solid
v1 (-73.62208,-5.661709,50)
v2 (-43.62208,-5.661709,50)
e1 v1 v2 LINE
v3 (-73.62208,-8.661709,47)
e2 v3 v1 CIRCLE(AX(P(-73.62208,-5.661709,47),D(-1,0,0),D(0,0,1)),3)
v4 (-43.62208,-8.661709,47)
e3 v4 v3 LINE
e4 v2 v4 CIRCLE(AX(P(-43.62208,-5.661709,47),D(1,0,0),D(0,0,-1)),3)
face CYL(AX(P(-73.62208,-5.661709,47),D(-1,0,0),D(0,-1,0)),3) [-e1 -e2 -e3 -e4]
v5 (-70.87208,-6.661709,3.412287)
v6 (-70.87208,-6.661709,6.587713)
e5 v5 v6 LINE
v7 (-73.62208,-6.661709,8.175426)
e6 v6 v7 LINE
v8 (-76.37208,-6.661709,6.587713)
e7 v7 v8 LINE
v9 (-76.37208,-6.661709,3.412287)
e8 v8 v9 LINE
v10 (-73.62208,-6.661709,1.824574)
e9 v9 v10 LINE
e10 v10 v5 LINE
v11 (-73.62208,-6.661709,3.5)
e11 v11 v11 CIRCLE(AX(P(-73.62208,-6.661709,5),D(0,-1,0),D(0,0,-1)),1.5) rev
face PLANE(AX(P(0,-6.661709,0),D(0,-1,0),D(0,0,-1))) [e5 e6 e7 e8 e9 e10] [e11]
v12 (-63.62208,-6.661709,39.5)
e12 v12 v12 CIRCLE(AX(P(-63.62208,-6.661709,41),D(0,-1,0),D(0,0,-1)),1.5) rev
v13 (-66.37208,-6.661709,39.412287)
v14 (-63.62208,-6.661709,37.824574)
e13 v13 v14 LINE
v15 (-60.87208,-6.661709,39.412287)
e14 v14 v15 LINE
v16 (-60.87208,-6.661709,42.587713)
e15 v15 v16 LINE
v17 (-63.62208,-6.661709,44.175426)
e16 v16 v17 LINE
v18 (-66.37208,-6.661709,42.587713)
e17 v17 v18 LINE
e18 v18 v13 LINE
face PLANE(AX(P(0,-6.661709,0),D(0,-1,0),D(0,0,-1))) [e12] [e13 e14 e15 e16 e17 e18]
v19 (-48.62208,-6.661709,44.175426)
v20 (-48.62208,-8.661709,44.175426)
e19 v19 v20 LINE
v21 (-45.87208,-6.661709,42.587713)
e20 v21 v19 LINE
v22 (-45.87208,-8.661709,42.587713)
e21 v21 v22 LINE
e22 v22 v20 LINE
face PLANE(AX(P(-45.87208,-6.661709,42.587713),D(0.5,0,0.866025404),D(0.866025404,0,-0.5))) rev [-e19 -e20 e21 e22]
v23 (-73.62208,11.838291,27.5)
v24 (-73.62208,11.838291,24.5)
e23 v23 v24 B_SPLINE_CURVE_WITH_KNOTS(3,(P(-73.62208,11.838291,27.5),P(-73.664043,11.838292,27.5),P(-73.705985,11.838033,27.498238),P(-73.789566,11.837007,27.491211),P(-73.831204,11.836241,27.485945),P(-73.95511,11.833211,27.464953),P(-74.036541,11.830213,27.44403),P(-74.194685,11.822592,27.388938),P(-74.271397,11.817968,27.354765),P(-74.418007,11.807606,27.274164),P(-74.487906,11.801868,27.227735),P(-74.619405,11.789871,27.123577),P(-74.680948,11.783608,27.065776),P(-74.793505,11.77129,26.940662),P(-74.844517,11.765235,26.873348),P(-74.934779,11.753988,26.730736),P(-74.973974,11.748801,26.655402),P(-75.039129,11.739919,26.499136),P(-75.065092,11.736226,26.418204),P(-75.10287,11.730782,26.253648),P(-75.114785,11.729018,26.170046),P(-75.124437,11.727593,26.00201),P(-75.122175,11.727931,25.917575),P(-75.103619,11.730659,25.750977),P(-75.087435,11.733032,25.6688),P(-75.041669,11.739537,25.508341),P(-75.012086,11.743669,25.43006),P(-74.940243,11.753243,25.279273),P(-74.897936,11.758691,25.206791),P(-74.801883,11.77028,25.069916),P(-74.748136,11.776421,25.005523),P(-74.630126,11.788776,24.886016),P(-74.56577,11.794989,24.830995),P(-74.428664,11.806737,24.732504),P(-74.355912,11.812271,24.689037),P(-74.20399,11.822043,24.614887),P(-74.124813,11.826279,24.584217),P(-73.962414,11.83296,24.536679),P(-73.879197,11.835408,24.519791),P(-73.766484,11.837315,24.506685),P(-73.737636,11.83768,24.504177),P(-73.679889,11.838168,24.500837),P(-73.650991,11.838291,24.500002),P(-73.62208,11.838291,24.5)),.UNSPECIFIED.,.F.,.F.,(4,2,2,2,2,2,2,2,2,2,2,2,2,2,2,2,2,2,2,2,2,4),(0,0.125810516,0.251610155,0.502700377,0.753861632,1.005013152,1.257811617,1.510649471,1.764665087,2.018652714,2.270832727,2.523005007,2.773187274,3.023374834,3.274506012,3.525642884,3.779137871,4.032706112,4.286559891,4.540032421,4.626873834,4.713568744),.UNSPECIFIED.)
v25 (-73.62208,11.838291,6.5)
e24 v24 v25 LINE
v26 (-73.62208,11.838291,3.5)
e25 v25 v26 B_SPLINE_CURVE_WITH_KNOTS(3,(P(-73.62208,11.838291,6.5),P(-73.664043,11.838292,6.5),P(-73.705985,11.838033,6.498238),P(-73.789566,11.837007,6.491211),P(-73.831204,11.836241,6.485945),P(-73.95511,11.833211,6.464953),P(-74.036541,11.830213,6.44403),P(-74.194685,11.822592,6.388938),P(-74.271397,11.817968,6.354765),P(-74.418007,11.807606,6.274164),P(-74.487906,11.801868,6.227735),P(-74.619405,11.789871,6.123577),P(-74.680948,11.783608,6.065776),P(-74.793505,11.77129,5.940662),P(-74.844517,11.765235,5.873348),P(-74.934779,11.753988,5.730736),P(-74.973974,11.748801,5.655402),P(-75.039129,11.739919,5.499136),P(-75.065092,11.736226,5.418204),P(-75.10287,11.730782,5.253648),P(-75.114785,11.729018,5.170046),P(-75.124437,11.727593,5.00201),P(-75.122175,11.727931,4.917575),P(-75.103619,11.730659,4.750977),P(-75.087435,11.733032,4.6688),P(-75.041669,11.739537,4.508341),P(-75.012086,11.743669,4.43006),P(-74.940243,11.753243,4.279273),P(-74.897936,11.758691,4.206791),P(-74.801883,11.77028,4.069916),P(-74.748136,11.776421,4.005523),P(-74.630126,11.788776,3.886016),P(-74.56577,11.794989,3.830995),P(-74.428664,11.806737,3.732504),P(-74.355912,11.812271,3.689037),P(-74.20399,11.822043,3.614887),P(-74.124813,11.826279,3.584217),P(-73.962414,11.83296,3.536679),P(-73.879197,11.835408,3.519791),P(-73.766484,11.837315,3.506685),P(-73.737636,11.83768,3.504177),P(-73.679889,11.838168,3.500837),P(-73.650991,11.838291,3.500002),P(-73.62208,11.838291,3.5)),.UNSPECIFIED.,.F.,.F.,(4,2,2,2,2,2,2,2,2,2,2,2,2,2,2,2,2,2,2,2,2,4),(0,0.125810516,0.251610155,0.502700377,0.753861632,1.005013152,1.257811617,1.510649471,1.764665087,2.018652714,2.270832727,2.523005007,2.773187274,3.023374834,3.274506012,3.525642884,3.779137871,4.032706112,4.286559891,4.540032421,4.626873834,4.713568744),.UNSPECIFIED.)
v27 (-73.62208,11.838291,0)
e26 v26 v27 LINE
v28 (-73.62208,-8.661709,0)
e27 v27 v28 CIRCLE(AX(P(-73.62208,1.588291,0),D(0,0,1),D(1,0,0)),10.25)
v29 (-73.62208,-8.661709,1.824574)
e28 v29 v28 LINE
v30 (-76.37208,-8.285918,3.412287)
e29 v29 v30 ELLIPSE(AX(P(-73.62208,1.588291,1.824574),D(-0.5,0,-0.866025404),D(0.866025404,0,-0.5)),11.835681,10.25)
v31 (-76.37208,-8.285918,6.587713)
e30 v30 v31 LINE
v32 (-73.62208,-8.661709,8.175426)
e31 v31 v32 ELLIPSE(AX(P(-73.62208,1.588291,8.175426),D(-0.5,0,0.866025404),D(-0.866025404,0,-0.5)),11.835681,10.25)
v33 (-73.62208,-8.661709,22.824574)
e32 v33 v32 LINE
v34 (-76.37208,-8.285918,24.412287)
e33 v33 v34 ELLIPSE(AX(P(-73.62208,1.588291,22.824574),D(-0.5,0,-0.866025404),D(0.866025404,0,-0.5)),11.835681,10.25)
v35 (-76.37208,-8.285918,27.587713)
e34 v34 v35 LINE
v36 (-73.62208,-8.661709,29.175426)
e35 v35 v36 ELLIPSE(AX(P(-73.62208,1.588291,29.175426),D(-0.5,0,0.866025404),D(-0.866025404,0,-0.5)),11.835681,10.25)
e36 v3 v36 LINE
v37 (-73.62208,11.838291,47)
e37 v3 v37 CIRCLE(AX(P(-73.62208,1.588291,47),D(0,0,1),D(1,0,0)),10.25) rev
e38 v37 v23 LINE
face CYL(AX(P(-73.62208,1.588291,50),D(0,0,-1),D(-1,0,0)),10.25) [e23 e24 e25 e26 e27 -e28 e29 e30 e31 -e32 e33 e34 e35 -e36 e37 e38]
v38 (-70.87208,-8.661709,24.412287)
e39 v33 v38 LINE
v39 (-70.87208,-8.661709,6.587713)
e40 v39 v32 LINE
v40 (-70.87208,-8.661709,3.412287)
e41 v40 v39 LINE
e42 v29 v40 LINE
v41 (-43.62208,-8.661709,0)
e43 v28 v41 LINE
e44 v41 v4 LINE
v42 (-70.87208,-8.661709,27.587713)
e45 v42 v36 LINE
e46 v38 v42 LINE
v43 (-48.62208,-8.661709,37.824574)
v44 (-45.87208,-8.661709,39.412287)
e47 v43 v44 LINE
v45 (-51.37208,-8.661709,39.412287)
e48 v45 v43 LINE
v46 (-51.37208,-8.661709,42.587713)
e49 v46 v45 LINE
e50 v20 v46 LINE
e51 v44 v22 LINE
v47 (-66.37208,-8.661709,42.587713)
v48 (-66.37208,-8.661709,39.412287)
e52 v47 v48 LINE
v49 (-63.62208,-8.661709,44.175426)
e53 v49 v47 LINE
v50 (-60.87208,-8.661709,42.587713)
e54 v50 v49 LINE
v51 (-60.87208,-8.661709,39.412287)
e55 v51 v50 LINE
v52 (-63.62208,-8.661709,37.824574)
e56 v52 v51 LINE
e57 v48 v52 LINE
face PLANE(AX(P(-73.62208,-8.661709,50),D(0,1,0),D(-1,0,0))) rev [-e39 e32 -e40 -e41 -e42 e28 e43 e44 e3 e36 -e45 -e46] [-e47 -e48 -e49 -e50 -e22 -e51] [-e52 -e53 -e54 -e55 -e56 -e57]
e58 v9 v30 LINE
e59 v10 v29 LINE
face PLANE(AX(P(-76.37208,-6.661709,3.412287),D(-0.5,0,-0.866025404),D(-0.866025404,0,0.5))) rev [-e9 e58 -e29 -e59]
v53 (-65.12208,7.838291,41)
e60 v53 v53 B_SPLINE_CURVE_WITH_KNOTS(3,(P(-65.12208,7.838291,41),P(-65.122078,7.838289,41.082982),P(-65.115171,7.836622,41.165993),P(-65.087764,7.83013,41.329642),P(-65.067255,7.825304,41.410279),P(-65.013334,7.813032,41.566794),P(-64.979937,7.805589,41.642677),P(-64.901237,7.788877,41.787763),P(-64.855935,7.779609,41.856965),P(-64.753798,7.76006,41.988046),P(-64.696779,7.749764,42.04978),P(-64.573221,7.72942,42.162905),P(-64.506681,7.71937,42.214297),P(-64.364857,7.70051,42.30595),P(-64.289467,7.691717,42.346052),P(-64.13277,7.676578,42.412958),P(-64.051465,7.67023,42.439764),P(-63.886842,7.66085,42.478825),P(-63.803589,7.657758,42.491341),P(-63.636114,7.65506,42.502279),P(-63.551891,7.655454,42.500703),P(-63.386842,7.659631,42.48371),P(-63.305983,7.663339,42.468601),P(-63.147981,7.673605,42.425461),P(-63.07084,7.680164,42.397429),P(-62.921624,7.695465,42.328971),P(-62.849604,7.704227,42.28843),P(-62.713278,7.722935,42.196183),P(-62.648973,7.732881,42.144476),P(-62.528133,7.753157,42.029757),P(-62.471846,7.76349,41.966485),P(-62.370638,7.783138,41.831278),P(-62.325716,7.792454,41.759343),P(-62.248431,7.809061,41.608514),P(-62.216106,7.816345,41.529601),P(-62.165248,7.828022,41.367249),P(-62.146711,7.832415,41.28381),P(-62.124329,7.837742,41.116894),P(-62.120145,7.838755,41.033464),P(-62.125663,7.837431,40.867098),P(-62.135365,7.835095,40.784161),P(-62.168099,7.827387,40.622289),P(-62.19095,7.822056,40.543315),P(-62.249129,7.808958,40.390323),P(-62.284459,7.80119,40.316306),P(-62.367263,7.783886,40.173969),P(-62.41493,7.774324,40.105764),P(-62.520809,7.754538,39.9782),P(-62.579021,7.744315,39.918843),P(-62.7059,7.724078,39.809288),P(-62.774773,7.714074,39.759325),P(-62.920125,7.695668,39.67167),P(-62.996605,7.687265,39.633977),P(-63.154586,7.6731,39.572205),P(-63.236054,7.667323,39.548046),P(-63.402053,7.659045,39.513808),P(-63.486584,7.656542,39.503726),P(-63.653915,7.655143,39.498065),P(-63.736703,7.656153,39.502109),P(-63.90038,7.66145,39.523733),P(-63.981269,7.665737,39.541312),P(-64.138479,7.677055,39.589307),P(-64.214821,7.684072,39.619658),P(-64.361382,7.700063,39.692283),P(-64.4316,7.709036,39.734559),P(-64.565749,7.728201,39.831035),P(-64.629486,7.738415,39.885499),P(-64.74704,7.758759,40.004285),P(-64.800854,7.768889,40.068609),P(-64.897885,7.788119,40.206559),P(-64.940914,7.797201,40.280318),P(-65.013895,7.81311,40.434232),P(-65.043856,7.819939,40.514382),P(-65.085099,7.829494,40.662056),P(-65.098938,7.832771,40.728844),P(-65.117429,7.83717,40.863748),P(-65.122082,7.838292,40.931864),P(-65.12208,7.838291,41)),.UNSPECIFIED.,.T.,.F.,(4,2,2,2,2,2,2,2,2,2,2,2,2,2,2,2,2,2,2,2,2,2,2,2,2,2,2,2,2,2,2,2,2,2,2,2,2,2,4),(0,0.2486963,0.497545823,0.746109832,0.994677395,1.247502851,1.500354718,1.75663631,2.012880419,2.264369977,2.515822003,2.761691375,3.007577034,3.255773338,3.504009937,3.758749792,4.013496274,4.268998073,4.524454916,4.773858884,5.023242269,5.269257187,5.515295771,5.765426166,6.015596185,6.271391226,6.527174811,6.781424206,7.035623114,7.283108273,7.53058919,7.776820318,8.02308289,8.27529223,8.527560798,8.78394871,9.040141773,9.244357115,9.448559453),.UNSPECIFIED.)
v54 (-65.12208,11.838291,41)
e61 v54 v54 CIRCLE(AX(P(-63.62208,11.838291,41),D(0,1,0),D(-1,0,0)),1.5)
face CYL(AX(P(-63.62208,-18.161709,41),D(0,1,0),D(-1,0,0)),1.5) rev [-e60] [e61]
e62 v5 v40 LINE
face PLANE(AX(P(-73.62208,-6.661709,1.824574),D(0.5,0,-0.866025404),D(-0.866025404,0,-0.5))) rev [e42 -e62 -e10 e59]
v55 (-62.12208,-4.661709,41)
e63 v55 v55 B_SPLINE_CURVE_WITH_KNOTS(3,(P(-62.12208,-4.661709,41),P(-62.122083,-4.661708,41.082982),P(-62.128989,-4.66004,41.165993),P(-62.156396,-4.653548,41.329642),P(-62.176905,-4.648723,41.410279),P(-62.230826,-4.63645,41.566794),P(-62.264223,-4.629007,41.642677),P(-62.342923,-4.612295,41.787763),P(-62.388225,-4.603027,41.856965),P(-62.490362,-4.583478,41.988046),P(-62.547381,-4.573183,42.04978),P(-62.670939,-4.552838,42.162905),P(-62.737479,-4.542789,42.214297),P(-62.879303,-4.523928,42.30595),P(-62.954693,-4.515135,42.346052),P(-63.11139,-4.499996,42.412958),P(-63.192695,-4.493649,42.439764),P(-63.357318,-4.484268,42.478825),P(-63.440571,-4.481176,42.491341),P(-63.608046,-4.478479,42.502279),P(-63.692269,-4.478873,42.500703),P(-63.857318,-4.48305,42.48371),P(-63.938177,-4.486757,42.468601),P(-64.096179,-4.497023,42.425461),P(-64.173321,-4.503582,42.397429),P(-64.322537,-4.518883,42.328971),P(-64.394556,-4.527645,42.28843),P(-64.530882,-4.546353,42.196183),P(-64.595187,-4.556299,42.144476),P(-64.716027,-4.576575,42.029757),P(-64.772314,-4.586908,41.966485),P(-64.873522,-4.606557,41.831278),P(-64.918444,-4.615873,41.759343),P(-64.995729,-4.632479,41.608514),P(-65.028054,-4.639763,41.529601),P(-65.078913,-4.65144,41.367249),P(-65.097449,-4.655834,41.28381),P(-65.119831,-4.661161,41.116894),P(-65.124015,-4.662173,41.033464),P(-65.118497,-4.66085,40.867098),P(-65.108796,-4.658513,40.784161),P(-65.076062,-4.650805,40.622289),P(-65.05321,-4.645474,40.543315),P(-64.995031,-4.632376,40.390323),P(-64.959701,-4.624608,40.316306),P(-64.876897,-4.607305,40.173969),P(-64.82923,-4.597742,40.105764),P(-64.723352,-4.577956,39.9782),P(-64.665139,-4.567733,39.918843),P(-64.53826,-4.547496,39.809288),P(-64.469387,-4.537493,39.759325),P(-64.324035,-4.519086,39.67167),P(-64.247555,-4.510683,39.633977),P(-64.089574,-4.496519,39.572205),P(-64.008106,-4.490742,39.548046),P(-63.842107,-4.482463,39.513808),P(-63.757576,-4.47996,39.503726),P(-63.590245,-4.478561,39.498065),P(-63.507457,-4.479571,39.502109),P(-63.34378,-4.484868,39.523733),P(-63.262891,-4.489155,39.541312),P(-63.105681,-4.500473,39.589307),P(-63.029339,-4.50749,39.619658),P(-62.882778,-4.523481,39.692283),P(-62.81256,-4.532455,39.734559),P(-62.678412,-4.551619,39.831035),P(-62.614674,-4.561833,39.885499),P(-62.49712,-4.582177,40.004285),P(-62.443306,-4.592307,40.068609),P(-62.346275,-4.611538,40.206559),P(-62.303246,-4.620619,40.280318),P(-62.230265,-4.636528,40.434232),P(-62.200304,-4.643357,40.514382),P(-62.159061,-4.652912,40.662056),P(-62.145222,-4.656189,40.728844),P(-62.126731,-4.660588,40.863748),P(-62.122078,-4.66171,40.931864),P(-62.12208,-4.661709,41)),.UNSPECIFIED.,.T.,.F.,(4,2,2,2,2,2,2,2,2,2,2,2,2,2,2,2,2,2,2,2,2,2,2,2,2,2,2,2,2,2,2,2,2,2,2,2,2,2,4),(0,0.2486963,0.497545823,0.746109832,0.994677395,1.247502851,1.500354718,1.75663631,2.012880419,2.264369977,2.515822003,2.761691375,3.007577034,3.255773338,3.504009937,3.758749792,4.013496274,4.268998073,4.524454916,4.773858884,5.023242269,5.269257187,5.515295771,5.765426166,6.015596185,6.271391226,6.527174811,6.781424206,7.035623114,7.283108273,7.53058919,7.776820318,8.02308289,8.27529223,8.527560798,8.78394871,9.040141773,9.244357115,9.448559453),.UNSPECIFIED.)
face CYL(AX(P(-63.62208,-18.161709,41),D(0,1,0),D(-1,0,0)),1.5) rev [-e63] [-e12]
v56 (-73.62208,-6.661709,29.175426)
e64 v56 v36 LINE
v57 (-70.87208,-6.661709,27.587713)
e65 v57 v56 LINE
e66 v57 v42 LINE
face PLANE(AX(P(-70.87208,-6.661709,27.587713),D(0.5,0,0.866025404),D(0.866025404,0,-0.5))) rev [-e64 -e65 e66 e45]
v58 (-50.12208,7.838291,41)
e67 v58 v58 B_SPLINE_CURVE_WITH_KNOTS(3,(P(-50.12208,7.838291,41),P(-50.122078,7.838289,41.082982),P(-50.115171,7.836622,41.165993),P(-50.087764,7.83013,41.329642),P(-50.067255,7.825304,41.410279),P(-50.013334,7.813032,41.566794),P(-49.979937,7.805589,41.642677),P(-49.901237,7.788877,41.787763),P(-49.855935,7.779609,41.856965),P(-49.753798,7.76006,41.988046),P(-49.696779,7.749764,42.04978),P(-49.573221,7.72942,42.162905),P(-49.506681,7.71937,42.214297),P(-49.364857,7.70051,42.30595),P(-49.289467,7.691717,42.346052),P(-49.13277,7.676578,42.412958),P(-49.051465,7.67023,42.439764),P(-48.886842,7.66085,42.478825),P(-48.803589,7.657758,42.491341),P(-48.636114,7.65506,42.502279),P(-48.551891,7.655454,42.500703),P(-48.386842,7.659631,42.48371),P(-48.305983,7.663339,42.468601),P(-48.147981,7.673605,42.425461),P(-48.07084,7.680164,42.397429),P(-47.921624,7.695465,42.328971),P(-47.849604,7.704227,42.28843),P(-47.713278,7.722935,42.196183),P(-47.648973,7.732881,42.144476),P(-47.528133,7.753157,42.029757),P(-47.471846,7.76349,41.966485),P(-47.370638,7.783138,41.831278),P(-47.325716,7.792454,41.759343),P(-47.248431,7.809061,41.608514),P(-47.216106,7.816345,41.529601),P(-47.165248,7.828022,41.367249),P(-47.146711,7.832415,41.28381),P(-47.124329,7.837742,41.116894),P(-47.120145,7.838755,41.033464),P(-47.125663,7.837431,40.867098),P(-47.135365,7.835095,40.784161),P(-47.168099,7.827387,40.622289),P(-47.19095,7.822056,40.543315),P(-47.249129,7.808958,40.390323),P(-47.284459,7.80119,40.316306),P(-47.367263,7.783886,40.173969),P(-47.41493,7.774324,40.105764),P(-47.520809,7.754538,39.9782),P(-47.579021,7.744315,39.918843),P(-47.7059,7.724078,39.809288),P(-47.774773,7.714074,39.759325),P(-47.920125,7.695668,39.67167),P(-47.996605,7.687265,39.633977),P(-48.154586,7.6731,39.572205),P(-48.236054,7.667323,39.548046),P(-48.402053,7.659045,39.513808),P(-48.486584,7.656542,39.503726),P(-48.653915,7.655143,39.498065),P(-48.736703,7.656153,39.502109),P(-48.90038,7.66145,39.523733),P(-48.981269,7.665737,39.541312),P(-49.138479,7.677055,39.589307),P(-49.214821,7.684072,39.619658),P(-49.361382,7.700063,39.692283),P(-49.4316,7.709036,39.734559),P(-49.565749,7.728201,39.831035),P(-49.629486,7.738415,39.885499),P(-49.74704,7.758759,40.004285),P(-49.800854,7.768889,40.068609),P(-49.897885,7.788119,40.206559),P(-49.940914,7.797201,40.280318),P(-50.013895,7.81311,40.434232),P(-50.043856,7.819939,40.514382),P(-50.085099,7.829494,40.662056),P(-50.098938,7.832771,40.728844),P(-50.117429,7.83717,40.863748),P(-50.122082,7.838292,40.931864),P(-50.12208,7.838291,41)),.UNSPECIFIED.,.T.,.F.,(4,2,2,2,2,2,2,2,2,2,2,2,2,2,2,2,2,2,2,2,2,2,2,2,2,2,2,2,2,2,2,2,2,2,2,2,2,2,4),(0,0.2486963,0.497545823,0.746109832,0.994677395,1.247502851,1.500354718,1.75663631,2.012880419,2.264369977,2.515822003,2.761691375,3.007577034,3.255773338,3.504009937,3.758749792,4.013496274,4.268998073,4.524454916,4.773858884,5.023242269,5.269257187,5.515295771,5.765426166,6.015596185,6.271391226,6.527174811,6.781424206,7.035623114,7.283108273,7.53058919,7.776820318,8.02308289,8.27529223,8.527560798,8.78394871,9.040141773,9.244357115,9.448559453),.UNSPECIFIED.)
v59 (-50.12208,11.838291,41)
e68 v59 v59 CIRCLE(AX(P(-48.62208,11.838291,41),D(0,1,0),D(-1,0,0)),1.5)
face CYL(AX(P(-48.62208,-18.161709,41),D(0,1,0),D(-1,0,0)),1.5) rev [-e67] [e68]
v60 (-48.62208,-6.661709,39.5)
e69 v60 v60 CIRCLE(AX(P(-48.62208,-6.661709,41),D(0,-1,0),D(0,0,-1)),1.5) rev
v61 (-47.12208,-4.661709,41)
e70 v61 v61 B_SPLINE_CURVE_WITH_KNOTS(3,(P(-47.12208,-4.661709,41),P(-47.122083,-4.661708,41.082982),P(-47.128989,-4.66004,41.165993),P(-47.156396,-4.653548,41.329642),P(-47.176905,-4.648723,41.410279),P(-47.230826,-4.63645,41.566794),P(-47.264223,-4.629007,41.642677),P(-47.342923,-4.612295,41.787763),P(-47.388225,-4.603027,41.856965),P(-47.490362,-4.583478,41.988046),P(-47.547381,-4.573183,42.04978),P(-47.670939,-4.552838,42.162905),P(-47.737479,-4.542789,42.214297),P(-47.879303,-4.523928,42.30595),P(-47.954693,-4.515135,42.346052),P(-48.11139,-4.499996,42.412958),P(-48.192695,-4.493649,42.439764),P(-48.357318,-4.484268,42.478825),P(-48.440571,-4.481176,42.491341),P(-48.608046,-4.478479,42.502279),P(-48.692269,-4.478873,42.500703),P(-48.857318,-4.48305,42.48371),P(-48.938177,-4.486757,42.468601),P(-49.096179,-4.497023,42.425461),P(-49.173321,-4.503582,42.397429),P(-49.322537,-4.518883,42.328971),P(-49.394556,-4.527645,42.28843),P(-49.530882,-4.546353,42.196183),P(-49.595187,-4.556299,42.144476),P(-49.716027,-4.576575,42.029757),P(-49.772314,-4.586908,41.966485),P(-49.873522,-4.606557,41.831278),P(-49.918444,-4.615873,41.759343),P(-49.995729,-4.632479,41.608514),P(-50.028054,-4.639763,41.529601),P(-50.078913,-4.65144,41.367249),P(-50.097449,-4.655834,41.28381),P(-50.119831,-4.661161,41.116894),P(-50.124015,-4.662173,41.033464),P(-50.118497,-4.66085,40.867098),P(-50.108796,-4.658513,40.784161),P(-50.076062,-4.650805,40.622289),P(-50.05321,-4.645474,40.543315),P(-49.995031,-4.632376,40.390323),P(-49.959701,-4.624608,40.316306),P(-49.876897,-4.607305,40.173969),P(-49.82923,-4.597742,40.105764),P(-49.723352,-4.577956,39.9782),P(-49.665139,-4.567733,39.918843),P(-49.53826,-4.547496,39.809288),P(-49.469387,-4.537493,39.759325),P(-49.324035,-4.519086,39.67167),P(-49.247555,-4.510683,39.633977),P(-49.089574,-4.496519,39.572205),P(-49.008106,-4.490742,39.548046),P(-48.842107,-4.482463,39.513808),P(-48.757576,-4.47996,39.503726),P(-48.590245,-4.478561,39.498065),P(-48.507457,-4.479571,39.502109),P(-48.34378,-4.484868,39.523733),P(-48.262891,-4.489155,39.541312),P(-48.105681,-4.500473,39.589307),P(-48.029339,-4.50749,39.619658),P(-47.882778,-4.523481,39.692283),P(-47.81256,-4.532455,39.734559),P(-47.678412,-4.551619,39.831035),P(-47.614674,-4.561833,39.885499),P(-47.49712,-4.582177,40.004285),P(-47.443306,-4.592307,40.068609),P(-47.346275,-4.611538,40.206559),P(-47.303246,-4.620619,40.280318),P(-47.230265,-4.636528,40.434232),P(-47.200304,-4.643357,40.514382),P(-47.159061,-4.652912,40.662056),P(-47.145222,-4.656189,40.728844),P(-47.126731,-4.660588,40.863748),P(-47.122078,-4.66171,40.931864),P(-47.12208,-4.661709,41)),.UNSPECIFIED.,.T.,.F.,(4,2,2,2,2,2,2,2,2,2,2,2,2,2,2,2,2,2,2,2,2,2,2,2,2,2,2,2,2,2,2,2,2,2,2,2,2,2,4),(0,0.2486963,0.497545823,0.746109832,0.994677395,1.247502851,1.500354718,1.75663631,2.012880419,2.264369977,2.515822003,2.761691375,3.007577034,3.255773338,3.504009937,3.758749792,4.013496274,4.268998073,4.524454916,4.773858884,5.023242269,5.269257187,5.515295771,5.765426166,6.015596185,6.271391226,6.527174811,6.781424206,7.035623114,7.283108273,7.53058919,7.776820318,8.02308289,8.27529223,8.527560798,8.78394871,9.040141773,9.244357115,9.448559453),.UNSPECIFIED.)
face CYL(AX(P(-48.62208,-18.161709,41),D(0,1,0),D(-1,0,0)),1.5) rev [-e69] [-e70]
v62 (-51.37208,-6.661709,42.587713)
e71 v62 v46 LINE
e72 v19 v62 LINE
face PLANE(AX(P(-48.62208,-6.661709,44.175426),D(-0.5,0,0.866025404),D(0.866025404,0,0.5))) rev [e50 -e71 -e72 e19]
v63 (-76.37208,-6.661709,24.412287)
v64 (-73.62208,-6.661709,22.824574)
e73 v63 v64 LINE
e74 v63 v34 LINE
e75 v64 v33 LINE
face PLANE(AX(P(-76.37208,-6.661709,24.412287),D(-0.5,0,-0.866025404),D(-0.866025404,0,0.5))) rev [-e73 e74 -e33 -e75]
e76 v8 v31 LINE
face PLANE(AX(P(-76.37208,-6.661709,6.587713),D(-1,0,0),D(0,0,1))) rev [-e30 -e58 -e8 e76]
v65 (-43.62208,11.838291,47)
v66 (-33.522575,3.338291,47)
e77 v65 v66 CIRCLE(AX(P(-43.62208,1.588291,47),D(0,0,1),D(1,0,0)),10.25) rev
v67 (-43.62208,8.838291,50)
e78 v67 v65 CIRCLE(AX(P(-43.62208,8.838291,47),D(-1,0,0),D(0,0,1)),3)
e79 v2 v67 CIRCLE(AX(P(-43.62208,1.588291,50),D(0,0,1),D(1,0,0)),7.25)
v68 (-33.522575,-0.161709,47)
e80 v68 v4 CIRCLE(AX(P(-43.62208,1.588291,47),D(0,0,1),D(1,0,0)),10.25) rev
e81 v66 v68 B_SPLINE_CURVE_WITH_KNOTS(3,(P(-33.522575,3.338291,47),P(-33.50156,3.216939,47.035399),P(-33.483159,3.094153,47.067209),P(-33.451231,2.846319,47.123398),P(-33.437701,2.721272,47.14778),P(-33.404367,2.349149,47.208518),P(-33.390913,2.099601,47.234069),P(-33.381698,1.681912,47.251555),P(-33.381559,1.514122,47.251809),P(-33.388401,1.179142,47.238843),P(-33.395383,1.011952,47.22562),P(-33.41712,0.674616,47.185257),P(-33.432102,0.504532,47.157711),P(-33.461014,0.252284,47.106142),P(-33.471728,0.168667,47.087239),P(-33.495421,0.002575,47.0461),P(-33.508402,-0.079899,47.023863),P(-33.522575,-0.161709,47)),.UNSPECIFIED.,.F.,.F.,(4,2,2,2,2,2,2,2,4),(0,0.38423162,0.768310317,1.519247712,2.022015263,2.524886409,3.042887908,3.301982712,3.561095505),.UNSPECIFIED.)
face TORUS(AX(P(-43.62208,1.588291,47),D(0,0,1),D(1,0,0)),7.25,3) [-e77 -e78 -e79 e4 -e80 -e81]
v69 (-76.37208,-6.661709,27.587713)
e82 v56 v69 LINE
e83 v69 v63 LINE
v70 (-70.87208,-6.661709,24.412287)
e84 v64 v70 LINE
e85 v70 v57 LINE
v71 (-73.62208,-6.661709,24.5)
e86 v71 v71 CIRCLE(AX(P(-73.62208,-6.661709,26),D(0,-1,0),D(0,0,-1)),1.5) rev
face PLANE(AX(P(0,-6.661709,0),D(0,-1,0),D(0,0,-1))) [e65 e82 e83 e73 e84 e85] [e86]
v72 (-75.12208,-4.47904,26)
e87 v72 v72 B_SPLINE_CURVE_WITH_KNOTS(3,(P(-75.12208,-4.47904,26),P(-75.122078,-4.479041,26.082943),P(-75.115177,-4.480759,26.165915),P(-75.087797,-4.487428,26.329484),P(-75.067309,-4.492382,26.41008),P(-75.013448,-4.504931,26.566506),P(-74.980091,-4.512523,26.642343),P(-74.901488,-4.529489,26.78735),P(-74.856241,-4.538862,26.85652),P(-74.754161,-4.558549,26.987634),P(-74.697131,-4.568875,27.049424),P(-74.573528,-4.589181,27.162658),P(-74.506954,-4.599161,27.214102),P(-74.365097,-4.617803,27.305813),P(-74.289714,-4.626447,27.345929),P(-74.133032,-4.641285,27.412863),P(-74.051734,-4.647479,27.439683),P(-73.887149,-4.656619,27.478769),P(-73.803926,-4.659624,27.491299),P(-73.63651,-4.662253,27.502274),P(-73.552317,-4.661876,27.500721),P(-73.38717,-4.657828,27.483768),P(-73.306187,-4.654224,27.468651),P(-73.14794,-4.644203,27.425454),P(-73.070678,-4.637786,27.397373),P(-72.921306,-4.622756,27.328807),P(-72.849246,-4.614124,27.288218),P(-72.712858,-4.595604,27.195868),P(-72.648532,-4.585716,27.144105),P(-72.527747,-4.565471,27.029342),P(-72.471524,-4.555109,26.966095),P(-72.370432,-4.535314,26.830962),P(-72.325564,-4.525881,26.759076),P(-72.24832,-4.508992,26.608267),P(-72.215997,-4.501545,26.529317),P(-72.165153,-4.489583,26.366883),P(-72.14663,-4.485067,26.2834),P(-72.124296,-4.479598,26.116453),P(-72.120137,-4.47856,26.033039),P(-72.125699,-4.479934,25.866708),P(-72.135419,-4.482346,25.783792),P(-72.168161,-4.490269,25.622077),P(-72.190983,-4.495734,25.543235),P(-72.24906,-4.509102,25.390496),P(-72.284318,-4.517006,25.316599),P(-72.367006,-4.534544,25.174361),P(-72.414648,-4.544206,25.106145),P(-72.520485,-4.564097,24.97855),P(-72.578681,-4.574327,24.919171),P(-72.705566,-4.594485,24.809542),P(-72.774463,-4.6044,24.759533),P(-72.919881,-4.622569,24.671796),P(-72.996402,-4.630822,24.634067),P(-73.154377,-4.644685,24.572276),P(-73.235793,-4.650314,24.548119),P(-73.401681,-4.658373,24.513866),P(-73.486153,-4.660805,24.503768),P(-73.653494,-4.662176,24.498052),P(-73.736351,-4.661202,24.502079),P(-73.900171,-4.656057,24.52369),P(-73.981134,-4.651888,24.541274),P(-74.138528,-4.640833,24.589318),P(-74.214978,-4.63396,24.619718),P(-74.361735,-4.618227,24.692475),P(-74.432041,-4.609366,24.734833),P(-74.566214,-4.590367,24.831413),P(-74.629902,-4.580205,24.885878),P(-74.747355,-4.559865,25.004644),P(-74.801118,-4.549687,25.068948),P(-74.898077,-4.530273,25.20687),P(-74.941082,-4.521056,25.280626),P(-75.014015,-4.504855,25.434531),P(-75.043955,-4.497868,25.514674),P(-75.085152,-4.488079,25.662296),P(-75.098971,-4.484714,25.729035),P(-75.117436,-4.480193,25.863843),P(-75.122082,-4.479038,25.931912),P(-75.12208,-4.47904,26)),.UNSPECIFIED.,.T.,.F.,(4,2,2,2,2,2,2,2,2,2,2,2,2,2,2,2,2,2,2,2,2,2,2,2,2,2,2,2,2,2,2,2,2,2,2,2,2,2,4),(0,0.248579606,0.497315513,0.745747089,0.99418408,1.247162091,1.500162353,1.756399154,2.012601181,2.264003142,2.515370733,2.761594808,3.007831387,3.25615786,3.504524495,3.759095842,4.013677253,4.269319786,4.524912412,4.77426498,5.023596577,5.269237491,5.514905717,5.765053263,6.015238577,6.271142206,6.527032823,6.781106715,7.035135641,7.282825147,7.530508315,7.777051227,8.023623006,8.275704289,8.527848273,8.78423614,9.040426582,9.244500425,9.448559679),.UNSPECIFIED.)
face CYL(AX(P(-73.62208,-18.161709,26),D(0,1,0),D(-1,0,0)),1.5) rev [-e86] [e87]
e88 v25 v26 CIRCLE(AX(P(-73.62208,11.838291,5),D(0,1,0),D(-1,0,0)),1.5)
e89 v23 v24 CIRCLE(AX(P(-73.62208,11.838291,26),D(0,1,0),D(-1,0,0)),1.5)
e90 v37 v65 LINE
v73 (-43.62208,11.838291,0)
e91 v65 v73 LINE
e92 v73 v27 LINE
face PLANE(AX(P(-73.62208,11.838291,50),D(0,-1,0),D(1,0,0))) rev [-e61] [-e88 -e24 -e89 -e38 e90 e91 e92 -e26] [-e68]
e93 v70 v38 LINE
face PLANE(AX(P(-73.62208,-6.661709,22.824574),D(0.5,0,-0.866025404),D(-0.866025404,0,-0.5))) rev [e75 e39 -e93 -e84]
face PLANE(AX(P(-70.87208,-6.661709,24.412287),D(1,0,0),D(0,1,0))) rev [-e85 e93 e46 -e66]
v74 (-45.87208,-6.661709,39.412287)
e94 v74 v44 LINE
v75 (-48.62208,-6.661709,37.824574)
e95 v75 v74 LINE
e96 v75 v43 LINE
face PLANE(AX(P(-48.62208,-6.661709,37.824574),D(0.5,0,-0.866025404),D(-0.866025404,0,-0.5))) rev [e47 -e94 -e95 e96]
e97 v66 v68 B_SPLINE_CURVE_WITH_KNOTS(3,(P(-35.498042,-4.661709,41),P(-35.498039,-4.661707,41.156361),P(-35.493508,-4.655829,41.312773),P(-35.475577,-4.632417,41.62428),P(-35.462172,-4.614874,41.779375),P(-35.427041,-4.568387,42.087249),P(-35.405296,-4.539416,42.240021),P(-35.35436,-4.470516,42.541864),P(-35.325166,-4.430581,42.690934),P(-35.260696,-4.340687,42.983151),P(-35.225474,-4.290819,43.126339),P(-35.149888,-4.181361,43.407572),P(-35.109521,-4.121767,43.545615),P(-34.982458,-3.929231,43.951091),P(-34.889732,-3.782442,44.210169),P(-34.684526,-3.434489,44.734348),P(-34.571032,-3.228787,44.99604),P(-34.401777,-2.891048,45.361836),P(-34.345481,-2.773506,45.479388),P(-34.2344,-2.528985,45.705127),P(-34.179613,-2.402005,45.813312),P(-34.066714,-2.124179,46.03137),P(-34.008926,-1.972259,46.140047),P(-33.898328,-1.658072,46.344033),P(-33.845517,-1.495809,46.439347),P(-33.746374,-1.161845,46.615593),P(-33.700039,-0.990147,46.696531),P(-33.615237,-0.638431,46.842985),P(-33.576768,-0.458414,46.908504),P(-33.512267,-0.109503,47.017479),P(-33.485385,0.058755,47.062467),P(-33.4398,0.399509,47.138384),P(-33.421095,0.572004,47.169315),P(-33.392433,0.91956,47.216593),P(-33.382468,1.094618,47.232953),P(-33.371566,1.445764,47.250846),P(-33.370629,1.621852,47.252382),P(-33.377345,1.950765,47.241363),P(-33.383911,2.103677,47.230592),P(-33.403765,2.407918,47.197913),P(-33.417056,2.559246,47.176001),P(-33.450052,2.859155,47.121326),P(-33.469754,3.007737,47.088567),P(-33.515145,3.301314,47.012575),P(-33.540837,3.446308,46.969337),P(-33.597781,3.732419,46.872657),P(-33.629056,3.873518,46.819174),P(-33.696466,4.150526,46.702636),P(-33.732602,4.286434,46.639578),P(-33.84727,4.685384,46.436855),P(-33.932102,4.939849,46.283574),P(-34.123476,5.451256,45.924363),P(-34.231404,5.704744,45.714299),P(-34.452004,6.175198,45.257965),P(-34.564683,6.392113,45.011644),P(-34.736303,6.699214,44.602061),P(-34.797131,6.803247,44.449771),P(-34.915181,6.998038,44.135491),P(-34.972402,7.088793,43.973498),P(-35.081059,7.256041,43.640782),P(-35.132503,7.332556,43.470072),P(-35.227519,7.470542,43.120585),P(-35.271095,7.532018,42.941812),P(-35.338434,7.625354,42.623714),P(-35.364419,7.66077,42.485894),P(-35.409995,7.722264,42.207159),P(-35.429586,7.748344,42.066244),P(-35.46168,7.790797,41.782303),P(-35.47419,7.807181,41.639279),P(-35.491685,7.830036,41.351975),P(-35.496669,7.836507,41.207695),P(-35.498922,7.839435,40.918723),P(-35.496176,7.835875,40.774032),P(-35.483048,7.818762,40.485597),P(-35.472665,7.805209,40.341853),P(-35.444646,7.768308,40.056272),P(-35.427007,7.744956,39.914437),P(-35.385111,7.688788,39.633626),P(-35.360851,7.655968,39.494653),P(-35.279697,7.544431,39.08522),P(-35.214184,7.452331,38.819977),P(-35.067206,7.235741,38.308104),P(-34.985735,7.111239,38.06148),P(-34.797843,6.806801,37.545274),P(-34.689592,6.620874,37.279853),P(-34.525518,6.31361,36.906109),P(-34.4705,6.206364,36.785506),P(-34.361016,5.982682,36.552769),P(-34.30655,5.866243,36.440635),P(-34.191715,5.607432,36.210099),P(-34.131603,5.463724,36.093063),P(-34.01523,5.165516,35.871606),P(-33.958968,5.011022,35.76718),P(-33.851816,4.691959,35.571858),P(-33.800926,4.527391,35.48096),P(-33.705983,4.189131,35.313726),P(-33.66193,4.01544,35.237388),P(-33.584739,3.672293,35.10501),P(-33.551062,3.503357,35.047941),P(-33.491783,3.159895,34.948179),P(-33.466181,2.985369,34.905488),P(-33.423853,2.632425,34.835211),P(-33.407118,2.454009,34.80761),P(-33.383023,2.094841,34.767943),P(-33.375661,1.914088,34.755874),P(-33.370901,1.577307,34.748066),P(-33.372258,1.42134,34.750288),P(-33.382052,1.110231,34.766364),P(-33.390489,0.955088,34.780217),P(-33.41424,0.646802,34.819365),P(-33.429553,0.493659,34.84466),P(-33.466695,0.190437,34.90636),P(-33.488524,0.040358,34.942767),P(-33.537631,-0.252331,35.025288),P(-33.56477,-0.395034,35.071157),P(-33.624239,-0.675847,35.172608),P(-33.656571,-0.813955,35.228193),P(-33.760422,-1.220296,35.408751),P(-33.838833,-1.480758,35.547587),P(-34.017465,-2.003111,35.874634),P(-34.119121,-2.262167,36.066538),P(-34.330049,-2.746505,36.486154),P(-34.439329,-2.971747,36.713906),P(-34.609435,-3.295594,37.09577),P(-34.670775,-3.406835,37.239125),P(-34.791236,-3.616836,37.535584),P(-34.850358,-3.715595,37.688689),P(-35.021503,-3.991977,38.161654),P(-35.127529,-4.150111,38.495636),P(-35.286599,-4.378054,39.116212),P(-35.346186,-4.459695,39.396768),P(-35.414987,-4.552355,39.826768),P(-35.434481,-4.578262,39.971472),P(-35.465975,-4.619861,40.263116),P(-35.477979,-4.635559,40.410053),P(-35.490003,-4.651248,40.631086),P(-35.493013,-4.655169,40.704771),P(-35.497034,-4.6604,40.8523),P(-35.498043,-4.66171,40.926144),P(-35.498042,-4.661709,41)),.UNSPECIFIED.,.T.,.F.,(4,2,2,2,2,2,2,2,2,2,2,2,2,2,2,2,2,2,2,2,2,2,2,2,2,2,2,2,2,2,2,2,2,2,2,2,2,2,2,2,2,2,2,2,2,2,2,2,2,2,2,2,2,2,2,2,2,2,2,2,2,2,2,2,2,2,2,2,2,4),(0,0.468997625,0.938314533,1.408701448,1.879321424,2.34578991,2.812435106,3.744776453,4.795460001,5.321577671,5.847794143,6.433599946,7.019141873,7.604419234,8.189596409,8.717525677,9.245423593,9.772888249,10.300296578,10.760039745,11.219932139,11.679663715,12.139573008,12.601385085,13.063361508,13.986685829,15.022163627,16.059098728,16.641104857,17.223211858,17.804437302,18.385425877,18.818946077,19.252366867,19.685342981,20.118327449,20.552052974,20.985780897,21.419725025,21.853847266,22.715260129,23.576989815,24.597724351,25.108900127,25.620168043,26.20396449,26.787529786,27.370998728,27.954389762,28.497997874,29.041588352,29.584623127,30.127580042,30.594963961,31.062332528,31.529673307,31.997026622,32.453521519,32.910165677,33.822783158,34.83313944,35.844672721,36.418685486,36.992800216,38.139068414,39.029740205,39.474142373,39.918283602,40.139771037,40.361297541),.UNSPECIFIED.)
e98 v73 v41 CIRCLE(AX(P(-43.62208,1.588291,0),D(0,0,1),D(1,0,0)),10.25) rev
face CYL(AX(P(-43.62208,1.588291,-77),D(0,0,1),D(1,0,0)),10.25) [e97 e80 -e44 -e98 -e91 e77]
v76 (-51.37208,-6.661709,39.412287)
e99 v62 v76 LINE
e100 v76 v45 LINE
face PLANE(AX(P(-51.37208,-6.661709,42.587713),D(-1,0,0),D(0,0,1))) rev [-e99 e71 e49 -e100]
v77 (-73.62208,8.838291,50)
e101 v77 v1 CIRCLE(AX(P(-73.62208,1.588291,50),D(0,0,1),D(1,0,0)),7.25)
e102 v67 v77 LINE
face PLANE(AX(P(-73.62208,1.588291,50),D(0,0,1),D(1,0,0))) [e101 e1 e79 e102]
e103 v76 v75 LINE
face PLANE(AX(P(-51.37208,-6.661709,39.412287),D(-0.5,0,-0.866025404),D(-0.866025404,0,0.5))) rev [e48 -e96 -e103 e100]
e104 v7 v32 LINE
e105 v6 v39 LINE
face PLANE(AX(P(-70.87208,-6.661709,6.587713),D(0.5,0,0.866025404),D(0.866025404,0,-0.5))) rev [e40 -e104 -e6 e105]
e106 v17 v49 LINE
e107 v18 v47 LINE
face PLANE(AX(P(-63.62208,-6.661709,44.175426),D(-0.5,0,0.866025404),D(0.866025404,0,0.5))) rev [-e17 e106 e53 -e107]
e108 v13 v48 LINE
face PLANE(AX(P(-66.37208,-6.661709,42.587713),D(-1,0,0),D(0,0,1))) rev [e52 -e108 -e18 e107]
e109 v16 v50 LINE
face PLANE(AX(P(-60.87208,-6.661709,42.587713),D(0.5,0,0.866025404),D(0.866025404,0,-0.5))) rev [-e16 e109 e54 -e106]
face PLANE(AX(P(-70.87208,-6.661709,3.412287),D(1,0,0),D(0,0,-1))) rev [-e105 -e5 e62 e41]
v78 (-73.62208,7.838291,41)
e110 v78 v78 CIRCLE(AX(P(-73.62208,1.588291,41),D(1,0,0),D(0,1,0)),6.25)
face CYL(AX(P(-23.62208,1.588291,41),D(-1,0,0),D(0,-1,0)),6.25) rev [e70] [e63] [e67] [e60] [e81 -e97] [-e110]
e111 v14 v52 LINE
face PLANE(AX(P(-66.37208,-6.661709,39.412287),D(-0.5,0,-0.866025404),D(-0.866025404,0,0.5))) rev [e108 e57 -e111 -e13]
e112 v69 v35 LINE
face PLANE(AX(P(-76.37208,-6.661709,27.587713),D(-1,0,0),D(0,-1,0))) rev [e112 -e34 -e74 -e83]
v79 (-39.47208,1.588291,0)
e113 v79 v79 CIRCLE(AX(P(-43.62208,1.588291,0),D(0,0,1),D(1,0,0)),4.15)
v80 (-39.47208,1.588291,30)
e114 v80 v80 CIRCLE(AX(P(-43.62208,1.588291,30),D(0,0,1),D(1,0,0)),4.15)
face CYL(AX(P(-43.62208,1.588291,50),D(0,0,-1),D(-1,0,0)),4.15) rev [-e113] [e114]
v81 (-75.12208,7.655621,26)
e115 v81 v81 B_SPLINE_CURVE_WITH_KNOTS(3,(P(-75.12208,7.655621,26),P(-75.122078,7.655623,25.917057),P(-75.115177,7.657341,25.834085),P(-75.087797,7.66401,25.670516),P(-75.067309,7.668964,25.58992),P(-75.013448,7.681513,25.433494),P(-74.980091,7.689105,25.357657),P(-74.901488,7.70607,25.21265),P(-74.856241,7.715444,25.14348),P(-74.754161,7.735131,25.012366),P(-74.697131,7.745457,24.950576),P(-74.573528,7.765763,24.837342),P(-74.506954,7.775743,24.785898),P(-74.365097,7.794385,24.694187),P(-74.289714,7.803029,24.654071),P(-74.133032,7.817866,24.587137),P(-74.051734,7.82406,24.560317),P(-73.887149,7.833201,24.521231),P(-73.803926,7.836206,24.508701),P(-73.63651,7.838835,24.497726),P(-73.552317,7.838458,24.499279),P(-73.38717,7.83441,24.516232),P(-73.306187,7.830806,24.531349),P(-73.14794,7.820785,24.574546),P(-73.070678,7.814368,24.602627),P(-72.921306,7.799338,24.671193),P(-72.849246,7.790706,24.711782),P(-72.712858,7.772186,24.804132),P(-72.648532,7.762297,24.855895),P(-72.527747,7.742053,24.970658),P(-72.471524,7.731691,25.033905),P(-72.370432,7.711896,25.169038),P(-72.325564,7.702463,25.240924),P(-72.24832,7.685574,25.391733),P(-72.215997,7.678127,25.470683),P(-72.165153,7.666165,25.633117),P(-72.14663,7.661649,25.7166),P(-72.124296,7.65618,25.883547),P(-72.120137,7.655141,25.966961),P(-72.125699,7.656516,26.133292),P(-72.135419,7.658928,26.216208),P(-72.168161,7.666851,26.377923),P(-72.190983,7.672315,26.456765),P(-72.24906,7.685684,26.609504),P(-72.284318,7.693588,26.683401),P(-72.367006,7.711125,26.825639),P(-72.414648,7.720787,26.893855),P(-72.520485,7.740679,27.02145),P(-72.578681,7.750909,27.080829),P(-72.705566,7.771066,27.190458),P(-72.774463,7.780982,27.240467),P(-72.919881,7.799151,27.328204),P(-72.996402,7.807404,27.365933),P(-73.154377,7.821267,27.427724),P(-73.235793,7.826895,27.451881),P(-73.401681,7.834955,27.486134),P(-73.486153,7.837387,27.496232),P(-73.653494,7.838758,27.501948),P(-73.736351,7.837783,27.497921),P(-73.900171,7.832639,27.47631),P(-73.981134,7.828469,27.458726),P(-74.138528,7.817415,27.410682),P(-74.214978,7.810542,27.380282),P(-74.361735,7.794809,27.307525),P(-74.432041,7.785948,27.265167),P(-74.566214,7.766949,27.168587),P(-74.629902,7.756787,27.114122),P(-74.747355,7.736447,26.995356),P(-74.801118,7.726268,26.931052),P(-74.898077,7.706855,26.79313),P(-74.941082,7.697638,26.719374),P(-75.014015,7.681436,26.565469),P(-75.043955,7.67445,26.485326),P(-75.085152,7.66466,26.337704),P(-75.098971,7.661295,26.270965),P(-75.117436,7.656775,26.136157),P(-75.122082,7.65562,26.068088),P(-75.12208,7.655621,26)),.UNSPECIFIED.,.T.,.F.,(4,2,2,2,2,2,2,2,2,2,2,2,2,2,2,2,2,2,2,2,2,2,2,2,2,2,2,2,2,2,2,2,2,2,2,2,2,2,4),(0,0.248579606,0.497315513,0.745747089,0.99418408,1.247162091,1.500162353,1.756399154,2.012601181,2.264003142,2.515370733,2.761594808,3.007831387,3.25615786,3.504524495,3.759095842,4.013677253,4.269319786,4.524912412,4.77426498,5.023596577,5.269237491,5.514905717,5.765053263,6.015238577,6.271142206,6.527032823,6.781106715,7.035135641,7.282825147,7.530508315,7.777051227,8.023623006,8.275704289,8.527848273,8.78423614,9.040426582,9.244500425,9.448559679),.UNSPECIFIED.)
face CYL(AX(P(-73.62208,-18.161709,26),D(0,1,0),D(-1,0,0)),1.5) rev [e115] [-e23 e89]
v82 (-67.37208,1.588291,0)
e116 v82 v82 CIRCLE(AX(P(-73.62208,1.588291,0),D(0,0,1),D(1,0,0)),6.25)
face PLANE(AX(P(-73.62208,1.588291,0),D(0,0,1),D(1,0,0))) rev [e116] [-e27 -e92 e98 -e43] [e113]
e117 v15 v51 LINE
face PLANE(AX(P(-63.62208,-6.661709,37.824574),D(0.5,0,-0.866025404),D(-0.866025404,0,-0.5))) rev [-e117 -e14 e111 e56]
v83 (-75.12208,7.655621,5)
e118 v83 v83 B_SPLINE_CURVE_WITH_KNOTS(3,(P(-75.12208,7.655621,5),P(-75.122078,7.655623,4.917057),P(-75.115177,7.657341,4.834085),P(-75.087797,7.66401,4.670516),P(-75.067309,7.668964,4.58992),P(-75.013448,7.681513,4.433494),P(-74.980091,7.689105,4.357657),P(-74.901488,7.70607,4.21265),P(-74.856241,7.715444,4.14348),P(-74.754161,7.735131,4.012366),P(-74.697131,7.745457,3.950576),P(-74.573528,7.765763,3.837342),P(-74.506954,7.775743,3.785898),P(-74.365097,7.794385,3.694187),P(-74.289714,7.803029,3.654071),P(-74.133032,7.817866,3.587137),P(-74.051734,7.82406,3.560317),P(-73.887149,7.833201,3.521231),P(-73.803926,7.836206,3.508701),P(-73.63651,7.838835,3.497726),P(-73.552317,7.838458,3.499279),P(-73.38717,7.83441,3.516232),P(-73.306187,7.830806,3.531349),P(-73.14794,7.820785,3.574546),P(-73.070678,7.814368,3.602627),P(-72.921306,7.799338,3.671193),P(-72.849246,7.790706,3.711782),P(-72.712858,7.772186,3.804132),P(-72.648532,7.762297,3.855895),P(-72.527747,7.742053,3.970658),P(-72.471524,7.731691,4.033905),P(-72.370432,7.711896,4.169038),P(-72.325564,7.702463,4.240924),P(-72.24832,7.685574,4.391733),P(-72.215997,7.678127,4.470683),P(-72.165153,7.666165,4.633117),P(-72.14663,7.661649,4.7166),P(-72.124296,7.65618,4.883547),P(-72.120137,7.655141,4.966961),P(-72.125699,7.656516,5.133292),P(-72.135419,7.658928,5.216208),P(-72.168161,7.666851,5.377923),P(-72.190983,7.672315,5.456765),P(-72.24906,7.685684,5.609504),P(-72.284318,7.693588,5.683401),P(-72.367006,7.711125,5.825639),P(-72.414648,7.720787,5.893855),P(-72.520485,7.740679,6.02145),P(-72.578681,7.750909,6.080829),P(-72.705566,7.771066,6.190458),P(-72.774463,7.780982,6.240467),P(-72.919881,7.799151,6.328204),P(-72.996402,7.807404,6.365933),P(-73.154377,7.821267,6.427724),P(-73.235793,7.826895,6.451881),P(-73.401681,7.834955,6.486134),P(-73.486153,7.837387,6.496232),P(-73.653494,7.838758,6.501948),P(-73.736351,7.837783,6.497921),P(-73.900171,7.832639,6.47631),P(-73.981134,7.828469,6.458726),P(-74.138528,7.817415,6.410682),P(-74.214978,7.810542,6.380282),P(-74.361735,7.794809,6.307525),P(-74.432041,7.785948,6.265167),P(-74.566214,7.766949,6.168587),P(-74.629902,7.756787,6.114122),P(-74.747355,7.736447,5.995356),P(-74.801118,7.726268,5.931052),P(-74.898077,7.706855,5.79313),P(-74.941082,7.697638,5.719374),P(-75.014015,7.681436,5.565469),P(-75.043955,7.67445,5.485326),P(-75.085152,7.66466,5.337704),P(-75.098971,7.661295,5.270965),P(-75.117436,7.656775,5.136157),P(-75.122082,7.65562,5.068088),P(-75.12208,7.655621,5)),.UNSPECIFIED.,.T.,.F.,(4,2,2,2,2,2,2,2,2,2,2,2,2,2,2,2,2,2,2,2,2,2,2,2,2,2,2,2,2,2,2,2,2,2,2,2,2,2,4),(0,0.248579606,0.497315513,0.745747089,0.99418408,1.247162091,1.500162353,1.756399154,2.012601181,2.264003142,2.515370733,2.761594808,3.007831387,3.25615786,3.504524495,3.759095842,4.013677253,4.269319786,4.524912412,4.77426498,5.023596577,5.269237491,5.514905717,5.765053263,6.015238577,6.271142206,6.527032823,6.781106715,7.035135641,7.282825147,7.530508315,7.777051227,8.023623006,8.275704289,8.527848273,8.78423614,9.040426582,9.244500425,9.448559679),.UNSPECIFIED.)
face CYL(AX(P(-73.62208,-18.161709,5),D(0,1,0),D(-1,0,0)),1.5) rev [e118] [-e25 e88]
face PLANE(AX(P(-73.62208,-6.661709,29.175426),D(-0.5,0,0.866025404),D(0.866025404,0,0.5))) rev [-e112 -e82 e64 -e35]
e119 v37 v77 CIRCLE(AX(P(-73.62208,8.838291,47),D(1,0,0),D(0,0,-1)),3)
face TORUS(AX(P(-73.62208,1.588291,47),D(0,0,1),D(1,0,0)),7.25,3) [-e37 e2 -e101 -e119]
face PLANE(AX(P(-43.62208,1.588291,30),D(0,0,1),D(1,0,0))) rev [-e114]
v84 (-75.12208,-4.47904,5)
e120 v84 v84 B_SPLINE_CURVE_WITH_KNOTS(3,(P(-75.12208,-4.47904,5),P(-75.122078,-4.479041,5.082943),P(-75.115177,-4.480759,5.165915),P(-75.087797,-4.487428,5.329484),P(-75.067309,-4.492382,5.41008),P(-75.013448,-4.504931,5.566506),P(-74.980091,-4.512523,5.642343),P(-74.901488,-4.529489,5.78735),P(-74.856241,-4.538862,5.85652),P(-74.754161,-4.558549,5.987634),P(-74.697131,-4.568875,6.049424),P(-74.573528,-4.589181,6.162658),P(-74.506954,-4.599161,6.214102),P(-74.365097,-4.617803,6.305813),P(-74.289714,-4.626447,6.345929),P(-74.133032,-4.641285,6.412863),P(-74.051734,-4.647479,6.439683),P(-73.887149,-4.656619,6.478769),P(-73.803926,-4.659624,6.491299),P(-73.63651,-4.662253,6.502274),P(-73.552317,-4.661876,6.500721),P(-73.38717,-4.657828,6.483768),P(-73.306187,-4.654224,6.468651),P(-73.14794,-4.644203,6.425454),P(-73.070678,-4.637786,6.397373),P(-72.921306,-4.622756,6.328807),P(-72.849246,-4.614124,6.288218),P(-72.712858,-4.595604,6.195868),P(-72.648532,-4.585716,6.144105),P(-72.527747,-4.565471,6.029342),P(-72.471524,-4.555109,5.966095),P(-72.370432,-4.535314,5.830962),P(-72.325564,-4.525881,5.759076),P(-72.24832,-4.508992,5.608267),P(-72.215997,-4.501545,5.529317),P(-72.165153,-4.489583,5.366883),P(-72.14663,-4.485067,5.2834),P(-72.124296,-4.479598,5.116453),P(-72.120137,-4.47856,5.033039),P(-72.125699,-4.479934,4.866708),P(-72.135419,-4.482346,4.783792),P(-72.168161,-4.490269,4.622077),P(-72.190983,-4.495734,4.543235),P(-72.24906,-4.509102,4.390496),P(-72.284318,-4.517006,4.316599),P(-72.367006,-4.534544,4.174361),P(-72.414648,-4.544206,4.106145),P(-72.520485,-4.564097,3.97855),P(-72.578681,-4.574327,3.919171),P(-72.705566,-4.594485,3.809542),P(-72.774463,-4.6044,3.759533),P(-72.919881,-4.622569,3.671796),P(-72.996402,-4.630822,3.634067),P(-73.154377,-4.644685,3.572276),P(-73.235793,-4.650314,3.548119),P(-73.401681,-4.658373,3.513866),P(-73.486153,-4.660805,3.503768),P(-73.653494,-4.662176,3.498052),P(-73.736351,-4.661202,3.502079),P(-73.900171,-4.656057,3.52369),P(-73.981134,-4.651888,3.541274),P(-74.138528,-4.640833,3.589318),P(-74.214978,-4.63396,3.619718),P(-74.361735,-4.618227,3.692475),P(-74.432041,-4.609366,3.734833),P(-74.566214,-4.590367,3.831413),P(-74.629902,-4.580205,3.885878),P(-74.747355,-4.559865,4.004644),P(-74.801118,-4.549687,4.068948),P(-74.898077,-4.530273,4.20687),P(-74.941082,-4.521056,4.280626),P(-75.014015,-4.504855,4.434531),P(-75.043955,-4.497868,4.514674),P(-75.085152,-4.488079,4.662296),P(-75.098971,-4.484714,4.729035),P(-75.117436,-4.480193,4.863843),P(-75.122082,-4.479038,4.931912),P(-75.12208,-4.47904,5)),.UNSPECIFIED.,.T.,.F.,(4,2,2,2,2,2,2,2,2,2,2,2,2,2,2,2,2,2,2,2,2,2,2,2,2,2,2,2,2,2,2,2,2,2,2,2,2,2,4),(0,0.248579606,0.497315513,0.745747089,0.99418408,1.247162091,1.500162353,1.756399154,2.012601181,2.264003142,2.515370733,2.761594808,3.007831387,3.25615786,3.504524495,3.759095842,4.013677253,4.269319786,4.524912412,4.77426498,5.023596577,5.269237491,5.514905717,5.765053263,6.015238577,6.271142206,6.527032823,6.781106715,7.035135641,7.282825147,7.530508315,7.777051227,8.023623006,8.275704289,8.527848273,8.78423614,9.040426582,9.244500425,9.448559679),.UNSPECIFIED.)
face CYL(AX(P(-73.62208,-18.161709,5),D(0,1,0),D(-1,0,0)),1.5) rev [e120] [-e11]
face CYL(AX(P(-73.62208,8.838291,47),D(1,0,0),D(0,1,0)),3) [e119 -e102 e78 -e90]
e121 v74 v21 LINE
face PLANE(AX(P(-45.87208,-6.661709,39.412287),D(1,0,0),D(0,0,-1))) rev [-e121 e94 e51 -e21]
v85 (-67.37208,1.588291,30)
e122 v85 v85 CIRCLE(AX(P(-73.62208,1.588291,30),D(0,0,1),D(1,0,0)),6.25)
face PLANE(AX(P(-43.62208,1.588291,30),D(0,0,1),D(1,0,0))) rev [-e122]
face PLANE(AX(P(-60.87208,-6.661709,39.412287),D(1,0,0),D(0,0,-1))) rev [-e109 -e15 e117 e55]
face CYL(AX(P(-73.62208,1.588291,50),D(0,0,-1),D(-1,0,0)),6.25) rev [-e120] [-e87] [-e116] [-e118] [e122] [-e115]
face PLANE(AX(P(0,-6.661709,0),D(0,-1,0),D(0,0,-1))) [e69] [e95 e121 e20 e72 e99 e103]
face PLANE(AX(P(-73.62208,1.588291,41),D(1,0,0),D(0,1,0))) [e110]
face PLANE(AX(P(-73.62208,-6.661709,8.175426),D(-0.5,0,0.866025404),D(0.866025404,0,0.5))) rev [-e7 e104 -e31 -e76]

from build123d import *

# Parameters (mm, degrees)
SKETCH1_R           = 6.25
SKETCH1_R_2         = 4.15
BOSS_EXTRUDE1_DEPTH = 50
CUT_EXTRUDE1_DEPTH  = 127
BOSS_EXTRUDE2_DEPTH = 20
SKETCH4_R           = 6.25
CUT_EXTRUDE2_DEPTH  = 20
CUT_EXTRUDE3_START  = -30
SKETCH5_R           = 6.25
CUT_EXTRUDE3_DEPTH  = 30
FILLET1_R           = 3
SKETCH6_R           = 4.5
BOSS_EXTRUDE3_DEPTH = 30
SKETCH7_R           = 1.5
CUT_EXTRUDE4_DEPTH  = 30
CUT_EXTRUDE5_DEPTH  = 2
CUT_EXTRUDE6_START  = -30
SKETCH9_R           = 4.5
CUT_EXTRUDE6_DEPTH  = 30


with BuildPart() as part:
    # Sketch1 → Boss-Extrude1 (new body)
    with BuildSketch(Plane.XY):
        with BuildLine():
            Line((-73.62208004, 11.83829087), (106.37791996, 11.83829087))
            ThreePointArc((106.37791996, 11.83829087), (116.62791996, 1.58829087), (106.37791996, -8.66170913))
            Line((106.37791996, -8.66170913), (-73.62208004, -8.66170913))
            ThreePointArc((-73.62208004, -8.66170913), (-83.87208004, 1.58829087), (-73.62208004, 11.83829087))
        make_face()
        with Locations((-73.62208004, 1.58829087)):
            Circle(SKETCH1_R, mode=Mode.SUBTRACT)
        with Locations((-43.62208004, 1.58829087)):
            Circle(SKETCH1_R_2, mode=Mode.SUBTRACT)
        with Locations(Location((76.37791996, 1.58829087, 0), (0, 0, 180))):
            Circle(SKETCH1_R_2, mode=Mode.SUBTRACT)
        with Locations(Location((106.37791996, 1.58829087, 0), (0, 0, 180))):
            Circle(SKETCH1_R, mode=Mode.SUBTRACT)
    extrude(amount=BOSS_EXTRUDE1_DEPTH)

    # Sketch2 → Cut-Extrude1 (cut)
    with BuildSketch(Plane.XY.offset(50)):
        with BuildLine():
            Line((-43.62208004, 11.83829087), (132.206329773, 11.83829087))
            Line((132.206329773, 11.83829087), (132.206329773, -8.66170913))
            Line((132.206329773, -8.66170913), (-43.62208004, -8.66170913))
            ThreePointArc((-43.62208004, -8.66170913), (-33.37208004, 1.58829087), (-43.62208004, 11.83829087))
        make_face()
    extrude(amount=-CUT_EXTRUDE1_DEPTH, mode=Mode.SUBTRACT)

    # Sketch3 → Boss-Extrude2 (add)
    with BuildSketch(Plane.XY.offset(50)):
        with BuildLine():
            Line((-43.62208004, 11.83829087), (-73.62208004, 11.83829087))
            ThreePointArc((-73.62208004, 11.83829087), (-83.87208004, 1.58829087), (-73.62208004, -8.66170913))
            Line((-73.62208004, -8.66170913), (-43.62208004, -8.66170913))
            ThreePointArc((-43.62208004, -8.66170913), (-33.37208004, 1.58829087), (-43.62208004, 11.83829087))
        make_face()
    extrude(amount=-BOSS_EXTRUDE2_DEPTH)

    # Sketch4 → Cut-Extrude2 (cut)
    with BuildSketch(Plane.ZY.offset(43.62208004)):
        with Locations(Location((41, 1.58829087, 0), (0, 0, 270))):
            Circle(SKETCH4_R)
    extrude(amount=-CUT_EXTRUDE2_DEPTH, mode=Mode.SUBTRACT)

    # Sketch5 → Cut-Extrude3 (cut)
    with BuildSketch(Plane(origin=(-43.62208004, 0, 0), x_dir=(0, 0, -1), z_dir=(1, 0, 0)).offset(CUT_EXTRUDE3_START)):
        with Locations(Location((-41, 1.58829087, 0), (0, 0, 270))):
            Circle(SKETCH5_R)
    extrude(amount=CUT_EXTRUDE3_DEPTH, mode=Mode.SUBTRACT)

    # Fillet1
    # the kernel refuses this fillet: 3 mm, written as the material it takes off along each edge
    with BuildSketch(Plane(origin=(-73.62208004, 11.83829087, 50), x_dir=(0, 0, -1), z_dir=(1, 0, 0)), Plane(origin=(-43.62208004, -8.66170913, 50), x_dir=(0, 0, -1), z_dir=(-1, 0, 0))) as fillet1_piece_1:
        with BuildLine():
            CenterArc((FILLET1_R, -FILLET1_R), FILLET1_R, 90, 90)
            Line((0, -FILLET1_R), (0, 0))
            Line((0, 0), (FILLET1_R, 0))
        make_face()
    extrude(amount=30, mode=Mode.SUBTRACT)
    with BuildSketch(Plane(origin=(-73.62208004, 1.58829087, 50), x_dir=(0, -1, 0), z_dir=(1, 0, 0))) as fillet1_piece_2:
        with BuildLine():
            CenterArc((10.25 - FILLET1_R, FILLET1_R), FILLET1_R, 270, 90)
            Line((10.25, FILLET1_R), (10.25, 0))
            Line((10.25, 0), (10.25 - FILLET1_R, 0))
        make_face()
    revolve(axis=Axis((-73.62208004, 1.58829087, 50), (0, 0, -1)), revolution_arc=180, mode=Mode.SUBTRACT)
    with BuildSketch(Plane(origin=(-43.62208004, 1.58829087, 50), x_dir=(0, -1, 0), z_dir=(-1, 0, 0))) as fillet1_piece_3:
        with BuildLine():
            CenterArc((10.25 - FILLET1_R, -FILLET1_R), FILLET1_R, 0, 90)
            Line((10.25 - FILLET1_R, 0), (10.25, 0))
            Line((10.25, 0), (10.25, -FILLET1_R))
        make_face()
    revolve(axis=Axis((-43.62208004, 1.58829087, 50), (0, 0, 1)), revolution_arc=180, mode=Mode.SUBTRACT)

    # Sketch6 → Boss-Extrude3 (add)
    with BuildSketch(Plane(origin=(0, 0, 30), x_dir=(-1, 0, 0), z_dir=(0, 0, -1))):
        with Locations(Location((73.62208004, 1.58829087, 0), (0, 0, 180))):
            Circle(SKETCH6_R)
    extrude(amount=BOSS_EXTRUDE3_DEPTH)

    # Sketch7 → Cut-Extrude4 (cut)
    with BuildSketch(Plane(origin=(0, 11.83829087, 0), x_dir=(1, 0, 0), z_dir=(0, 1, 0))):
        with Locations(Location((-48.62208004, -41, 0), (0, 0, 180))):
            Circle(SKETCH7_R)
        with Locations(Location((-63.62208004, -41, 0), (0, 0, 180))):
            Circle(SKETCH7_R)
        with Locations(Location((-73.62208004, -26, 0), (0, 0, 180))):
            Circle(SKETCH7_R)
        with Locations(Location((-73.62208004, -5, 0), (0, 0, 180))):
            Circle(SKETCH7_R)
    extrude(amount=-CUT_EXTRUDE4_DEPTH, mode=Mode.SUBTRACT)

    # Sketch8 → Cut-Extrude5 (cut)
    with BuildSketch(Plane(origin=(0, -8.66170913, 0), x_dir=(-1, 0, 0), z_dir=(0, -1, 0))):
        Polygon((73.62208004, -8.175426481), (76.37208004, -6.58771324), (76.37208004, -3.41228676), (73.62208004, -1.824573519), (70.87208004, -3.41228676), (70.87208004, -6.58771324), align=None)
        Polygon((73.62208004, -29.175426481), (76.37208004, -27.58771324), (76.37208004, -24.41228676), (73.62208004, -22.824573519), (70.87208004, -24.41228676), (70.87208004, -27.58771324), align=None)
        Polygon((63.62208004, -44.175426481), (66.37208004, -42.58771324), (66.37208004, -39.41228676), (63.62208004, -37.824573519), (60.87208004, -39.41228676), (60.87208004, -42.58771324), align=None)
        Polygon((48.62208004, -44.175426481), (51.37208004, -42.58771324), (51.37208004, -39.41228676), (48.62208004, -37.824573519), (45.87208004, -39.41228676), (45.87208004, -42.58771324), align=None)
    extrude(amount=-CUT_EXTRUDE5_DEPTH, mode=Mode.SUBTRACT)

    # Sketch9 → Cut-Extrude6 (cut)
    with BuildSketch(Plane(origin=(0, 0, 0), x_dir=(-1, 0, 0), z_dir=(0, 0, -1)).offset(CUT_EXTRUDE6_START)):
        with Locations((73.62208004, 1.58829087)):
            Circle(SKETCH9_R)
    extrude(amount=CUT_EXTRUDE6_DEPTH, mode=Mode.SUBTRACT)


solid = part.part
